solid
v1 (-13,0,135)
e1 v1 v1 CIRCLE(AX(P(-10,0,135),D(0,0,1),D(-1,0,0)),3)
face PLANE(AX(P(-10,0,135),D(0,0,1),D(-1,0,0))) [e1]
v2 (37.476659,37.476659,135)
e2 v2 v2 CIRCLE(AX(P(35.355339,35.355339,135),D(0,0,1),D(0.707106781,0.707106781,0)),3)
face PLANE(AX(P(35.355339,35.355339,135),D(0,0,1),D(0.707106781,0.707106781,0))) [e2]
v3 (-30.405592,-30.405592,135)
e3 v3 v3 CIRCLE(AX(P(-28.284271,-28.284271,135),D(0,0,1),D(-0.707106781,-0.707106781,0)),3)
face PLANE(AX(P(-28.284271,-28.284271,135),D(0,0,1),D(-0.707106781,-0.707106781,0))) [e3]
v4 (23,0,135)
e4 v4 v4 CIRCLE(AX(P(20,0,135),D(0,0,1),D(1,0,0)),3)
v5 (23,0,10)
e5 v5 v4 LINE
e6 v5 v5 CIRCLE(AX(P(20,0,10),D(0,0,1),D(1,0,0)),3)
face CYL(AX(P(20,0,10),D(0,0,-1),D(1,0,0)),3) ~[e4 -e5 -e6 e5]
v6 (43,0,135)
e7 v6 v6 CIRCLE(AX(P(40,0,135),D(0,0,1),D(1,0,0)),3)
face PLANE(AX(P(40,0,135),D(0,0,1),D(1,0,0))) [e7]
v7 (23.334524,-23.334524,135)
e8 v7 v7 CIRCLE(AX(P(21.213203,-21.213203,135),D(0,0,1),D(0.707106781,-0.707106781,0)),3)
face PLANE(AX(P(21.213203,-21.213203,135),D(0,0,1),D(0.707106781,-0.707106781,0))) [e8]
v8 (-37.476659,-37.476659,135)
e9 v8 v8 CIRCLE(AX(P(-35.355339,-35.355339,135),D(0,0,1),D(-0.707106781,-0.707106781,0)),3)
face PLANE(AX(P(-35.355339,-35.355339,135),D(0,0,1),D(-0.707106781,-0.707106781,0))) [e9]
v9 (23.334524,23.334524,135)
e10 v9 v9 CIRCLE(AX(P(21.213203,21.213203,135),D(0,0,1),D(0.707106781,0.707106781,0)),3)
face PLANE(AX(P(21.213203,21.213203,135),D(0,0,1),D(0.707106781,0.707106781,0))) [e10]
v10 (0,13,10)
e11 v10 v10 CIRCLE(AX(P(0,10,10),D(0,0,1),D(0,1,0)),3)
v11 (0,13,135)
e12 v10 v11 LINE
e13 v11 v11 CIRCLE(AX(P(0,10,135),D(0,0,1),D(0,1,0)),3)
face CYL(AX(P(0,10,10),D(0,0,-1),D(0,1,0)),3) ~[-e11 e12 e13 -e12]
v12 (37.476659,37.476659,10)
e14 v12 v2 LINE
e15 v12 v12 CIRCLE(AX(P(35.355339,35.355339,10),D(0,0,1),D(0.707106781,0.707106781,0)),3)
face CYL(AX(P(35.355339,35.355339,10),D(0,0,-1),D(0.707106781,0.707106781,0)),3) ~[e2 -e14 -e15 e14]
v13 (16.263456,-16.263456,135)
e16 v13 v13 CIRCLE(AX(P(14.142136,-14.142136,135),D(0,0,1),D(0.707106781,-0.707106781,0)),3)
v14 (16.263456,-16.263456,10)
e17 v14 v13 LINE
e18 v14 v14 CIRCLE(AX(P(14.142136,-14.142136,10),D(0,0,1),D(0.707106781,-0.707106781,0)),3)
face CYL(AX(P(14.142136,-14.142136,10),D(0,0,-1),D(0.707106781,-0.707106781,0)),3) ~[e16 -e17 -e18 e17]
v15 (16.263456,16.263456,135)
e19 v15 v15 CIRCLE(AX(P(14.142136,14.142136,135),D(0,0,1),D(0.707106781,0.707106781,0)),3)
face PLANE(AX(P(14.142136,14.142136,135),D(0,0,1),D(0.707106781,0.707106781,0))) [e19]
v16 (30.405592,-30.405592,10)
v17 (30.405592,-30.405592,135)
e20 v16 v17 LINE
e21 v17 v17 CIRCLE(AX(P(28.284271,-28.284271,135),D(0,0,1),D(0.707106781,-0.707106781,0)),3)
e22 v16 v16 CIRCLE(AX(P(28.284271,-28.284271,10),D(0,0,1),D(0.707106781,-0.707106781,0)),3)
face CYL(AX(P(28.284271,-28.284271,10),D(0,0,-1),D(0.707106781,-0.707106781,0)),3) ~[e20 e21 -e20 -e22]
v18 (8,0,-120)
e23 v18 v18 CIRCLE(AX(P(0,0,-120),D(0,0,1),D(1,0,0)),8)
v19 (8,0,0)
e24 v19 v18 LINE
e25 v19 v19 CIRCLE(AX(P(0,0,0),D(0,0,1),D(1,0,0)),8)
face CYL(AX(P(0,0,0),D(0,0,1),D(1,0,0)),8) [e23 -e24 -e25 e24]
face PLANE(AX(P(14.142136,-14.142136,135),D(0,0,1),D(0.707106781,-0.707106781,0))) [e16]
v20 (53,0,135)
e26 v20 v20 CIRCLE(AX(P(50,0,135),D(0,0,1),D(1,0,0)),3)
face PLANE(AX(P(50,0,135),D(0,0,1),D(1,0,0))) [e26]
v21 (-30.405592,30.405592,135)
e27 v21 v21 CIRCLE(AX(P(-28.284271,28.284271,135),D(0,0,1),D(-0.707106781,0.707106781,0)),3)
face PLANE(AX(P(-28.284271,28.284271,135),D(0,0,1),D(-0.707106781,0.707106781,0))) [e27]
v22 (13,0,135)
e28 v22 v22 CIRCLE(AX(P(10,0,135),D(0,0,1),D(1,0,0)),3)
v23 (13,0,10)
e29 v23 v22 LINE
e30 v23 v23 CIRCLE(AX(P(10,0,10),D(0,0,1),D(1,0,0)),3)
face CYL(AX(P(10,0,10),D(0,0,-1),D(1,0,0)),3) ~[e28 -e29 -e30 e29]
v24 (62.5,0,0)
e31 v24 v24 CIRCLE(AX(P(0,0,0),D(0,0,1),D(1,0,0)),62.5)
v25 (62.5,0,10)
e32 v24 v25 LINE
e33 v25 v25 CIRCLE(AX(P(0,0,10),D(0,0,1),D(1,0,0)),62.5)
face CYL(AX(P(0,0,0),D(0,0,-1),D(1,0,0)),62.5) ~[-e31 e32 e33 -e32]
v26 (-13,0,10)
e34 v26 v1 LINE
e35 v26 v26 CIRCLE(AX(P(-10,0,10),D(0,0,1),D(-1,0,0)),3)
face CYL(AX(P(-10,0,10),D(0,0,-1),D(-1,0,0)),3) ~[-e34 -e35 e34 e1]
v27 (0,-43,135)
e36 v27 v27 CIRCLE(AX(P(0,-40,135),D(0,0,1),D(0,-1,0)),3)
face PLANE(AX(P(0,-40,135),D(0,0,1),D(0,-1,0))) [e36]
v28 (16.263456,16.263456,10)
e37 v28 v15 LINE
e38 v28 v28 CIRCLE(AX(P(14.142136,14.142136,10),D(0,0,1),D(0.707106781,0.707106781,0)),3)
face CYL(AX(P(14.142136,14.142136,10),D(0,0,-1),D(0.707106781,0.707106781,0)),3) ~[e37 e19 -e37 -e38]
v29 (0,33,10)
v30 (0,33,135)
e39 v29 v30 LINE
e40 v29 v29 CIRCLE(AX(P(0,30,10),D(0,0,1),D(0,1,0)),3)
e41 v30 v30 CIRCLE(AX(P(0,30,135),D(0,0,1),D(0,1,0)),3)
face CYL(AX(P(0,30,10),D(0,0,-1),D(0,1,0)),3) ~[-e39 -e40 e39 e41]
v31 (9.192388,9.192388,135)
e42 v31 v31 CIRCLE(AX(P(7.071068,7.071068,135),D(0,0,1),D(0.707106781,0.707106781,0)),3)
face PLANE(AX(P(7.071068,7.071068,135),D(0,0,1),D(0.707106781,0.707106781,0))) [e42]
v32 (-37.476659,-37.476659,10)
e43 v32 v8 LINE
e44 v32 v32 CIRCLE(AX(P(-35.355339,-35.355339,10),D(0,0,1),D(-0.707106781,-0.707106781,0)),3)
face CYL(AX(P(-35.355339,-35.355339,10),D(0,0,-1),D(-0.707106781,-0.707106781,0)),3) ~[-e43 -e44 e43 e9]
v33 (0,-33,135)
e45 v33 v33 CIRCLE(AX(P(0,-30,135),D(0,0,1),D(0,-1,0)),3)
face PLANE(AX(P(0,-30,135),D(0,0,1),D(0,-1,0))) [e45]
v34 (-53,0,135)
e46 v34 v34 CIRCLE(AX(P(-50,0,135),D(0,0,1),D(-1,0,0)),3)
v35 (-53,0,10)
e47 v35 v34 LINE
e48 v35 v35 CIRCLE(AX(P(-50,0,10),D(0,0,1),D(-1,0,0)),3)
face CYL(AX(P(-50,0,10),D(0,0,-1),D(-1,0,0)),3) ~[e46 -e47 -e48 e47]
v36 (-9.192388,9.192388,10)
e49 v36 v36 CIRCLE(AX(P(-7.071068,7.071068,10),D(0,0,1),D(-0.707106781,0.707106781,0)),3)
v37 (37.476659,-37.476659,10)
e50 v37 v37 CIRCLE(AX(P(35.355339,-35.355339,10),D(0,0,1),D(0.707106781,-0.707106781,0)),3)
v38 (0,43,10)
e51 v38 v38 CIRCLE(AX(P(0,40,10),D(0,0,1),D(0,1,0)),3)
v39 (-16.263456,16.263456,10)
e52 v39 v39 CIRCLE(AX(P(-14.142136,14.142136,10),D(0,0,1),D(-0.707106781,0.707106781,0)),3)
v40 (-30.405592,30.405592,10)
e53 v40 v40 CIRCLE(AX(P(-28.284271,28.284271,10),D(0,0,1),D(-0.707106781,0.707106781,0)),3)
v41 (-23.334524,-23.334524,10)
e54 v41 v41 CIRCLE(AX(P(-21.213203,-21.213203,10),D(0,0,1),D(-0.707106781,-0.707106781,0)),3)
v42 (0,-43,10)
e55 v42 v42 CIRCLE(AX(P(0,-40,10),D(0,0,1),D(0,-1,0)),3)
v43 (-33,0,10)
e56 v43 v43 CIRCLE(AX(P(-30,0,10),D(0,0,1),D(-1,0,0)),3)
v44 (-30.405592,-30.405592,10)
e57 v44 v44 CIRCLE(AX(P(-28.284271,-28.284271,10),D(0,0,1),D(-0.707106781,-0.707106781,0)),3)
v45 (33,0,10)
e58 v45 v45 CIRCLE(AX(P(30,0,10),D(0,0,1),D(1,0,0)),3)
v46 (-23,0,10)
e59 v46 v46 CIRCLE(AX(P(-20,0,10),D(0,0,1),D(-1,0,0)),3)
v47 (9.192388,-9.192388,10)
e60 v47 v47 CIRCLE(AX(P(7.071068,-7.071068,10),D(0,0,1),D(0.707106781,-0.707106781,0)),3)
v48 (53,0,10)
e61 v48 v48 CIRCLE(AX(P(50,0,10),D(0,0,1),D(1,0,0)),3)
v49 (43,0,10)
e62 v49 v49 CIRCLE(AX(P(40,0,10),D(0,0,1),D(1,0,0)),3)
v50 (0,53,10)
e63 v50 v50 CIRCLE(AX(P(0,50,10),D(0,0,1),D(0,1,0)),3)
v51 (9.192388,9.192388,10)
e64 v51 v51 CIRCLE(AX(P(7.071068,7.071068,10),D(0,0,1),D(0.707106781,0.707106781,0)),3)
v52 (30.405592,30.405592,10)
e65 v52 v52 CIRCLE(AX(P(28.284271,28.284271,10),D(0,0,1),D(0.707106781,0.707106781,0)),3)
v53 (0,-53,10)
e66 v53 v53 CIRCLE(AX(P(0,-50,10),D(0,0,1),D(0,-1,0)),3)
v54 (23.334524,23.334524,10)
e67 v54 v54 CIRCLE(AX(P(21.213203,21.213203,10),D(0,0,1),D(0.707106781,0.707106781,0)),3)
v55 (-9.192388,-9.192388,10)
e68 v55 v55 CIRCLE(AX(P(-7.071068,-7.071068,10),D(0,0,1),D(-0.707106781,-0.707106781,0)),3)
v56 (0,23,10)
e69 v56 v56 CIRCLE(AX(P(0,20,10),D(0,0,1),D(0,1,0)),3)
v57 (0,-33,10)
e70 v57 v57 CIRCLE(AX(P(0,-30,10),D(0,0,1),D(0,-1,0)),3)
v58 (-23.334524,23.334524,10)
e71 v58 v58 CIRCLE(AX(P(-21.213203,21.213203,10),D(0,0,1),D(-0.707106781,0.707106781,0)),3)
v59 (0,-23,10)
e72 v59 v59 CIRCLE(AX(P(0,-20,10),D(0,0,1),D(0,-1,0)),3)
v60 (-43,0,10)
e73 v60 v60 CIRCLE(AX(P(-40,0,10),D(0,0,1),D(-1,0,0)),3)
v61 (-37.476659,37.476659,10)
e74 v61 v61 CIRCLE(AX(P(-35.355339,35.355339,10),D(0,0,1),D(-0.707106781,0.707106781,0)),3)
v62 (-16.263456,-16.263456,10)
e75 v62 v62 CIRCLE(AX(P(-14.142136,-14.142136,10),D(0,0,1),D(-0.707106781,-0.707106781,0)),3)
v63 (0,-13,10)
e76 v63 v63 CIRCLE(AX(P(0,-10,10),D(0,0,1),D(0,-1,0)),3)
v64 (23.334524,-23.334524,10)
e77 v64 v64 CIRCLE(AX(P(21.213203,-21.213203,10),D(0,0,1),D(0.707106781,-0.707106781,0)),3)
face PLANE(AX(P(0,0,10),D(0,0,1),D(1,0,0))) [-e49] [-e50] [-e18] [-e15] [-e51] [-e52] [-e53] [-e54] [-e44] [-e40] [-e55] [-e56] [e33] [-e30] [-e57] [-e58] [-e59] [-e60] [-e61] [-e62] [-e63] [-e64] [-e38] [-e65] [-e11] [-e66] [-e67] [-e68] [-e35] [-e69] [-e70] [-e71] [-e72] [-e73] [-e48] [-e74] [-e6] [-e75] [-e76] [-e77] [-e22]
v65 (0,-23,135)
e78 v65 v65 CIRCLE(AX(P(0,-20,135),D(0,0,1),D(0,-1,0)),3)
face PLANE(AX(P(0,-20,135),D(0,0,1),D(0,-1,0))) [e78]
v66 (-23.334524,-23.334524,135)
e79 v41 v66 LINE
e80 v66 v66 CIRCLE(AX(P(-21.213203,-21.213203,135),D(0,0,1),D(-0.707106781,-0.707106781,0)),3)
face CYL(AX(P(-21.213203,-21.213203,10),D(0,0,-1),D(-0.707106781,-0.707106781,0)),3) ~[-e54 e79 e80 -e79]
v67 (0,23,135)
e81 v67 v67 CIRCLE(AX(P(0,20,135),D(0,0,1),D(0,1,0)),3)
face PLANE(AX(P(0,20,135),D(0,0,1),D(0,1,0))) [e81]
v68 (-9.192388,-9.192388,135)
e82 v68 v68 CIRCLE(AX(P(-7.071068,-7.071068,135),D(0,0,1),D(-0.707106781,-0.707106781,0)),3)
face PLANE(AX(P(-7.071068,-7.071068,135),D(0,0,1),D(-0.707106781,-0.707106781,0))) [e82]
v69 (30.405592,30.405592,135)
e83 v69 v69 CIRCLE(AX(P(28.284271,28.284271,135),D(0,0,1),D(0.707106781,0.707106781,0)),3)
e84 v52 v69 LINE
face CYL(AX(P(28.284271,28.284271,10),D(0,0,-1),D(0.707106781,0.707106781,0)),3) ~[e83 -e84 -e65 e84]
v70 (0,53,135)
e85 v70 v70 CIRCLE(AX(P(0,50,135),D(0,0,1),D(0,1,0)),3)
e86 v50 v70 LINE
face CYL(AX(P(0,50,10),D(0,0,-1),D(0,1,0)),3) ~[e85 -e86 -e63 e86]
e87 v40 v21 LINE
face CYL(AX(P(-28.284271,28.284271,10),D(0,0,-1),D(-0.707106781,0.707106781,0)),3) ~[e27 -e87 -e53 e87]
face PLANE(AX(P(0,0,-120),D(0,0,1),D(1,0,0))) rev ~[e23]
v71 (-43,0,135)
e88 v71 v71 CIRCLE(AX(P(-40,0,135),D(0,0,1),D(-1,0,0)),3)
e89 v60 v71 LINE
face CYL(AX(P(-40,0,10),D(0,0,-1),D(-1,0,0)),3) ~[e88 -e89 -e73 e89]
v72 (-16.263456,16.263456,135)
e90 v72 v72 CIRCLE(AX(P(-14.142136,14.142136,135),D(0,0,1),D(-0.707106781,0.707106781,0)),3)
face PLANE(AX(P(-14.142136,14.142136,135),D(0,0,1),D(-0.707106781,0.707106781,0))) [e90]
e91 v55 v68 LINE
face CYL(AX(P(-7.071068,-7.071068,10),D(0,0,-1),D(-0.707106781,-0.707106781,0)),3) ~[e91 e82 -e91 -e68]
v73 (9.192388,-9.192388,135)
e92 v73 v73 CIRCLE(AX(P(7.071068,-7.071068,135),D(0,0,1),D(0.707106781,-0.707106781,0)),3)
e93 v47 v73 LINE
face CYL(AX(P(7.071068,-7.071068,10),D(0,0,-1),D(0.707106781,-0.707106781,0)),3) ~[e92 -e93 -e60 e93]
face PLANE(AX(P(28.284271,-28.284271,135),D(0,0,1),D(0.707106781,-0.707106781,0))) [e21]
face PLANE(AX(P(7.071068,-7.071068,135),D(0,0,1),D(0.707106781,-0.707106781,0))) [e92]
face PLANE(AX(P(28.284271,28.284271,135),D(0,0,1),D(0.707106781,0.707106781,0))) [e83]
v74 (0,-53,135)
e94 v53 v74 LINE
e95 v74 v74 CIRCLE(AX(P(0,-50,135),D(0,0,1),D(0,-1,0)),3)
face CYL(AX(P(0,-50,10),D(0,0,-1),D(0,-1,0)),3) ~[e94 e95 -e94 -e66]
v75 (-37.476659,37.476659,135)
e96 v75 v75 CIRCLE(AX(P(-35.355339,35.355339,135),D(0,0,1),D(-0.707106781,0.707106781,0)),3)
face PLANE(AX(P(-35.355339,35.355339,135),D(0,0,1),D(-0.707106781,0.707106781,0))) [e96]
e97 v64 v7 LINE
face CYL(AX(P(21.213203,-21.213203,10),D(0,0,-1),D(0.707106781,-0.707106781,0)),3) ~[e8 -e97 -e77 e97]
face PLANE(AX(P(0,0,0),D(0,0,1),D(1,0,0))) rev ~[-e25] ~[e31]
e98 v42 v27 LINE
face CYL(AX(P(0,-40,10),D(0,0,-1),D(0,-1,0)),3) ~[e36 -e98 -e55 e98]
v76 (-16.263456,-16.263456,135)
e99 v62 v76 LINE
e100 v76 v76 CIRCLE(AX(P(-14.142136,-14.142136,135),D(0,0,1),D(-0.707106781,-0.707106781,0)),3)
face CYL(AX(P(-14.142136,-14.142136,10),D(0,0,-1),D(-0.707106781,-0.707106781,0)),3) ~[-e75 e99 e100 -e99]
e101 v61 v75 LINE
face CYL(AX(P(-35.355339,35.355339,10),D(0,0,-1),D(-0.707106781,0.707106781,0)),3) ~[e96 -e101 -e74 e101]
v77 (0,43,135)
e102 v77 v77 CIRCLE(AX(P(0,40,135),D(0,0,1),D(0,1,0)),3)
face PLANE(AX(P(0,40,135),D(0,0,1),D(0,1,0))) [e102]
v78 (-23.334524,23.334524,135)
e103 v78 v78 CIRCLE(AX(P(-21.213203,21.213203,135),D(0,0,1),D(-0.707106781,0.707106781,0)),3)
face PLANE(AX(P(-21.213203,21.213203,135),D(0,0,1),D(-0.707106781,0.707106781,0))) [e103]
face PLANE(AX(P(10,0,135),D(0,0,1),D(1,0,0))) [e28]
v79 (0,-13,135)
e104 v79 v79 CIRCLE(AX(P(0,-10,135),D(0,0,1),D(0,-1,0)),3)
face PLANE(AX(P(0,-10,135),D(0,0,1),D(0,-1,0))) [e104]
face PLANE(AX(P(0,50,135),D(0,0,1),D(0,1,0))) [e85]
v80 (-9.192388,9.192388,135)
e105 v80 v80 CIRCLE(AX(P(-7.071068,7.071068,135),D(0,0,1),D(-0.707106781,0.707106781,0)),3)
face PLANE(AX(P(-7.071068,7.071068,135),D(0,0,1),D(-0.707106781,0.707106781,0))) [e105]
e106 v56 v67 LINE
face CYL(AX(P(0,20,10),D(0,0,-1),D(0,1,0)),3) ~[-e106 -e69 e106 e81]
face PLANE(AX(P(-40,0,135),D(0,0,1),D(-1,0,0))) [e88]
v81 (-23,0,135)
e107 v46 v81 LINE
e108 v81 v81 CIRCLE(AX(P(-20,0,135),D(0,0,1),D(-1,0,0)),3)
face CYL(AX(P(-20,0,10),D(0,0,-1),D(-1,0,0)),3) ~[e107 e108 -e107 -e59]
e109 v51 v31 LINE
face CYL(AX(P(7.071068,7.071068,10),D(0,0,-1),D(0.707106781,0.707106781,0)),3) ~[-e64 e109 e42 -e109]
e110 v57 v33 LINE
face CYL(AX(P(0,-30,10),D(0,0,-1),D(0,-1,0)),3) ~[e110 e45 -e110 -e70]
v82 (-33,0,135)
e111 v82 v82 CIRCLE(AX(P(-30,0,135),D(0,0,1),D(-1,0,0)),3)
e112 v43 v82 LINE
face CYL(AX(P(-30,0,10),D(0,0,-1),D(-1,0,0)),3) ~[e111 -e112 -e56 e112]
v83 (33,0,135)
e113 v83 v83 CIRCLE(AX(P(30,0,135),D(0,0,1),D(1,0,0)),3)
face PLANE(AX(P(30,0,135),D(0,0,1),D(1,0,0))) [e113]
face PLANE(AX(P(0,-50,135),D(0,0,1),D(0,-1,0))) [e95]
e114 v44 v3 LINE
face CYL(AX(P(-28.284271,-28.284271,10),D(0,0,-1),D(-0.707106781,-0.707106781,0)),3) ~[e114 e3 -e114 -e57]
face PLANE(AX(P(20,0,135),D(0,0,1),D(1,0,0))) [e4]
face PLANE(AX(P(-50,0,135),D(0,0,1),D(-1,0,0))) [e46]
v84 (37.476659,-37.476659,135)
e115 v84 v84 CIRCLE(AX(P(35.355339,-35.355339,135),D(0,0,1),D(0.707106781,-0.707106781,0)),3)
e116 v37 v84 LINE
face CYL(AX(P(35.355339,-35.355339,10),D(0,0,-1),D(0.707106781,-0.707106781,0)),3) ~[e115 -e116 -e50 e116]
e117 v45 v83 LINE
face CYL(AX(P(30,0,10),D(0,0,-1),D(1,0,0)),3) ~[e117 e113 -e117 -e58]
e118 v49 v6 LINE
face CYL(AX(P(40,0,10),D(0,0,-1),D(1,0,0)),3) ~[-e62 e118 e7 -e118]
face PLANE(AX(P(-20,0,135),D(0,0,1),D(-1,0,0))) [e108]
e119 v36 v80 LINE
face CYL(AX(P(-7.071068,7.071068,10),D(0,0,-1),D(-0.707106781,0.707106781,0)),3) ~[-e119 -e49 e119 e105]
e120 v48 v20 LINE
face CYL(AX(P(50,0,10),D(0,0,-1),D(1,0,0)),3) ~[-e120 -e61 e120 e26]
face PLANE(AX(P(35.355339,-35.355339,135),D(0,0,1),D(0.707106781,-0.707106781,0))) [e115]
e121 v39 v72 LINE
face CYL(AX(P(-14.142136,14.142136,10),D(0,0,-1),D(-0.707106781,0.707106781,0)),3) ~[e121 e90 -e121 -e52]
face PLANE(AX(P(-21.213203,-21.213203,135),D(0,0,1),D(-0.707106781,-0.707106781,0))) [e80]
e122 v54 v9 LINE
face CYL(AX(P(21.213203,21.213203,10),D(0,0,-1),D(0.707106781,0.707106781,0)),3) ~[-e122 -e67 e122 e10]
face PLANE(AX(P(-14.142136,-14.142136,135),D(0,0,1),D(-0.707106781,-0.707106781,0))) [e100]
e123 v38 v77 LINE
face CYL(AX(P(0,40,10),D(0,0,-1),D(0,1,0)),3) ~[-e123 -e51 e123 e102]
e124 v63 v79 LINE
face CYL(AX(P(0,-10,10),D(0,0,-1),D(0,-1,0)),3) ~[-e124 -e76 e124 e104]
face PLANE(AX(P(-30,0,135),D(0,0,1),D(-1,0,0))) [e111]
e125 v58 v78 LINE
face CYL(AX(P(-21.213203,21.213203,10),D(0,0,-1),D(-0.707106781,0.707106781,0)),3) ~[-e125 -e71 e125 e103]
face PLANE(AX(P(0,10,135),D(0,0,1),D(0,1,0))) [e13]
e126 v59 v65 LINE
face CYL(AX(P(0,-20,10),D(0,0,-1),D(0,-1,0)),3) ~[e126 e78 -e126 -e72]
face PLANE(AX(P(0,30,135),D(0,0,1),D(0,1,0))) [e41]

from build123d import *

# Parameters (mm, degrees)
F0_R            = 62.5
F1_DEPTH        = 10
F2_R            = 3
F3_DEPTH        = 125
F3_COPIES_COUNT = 8
F4_R            = 8
F5_DEPTH        = 120


# Not quite as in the source:
# - a pattern or mirror of a feature is missing from the dataset's text; its kind, count and spacing are read off the source's solid


with BuildPart() as f1:
    # F0 (on Top) → F1 (new body)
    with BuildSketch(Plane.XY):
        Circle(F0_R)
    extrude(amount=F1_DEPTH)

    # F2 (on face) → F3 (join)
    with BuildSketch(Plane.XY.offset(10)):
        with Locations((10, 0)):
            Circle(F2_R)
        with Locations((20, 0)):
            Circle(F2_R)
        with Locations((30, 0)):
            Circle(F2_R)
        with Locations((40, 0)):
            Circle(F2_R)
        with Locations((50, 0)):
            Circle(F2_R)
    f3 = extrude(amount=F3_DEPTH)

    # F3_copies: F3 ×8 about axis
    f3_copies_axis = Axis((0, 0, 0), (0, 0, 1))
    for i in range(1, F3_COPIES_COUNT):
        add(f3.rotate(f3_copies_axis, i * 360 / F3_COPIES_COUNT))

    # F4 (on face) → F5 (join)
    with BuildSketch(Plane.XY):
        Circle(F4_R)
    extrude(amount=-F5_DEPTH)


solid = f1.part
